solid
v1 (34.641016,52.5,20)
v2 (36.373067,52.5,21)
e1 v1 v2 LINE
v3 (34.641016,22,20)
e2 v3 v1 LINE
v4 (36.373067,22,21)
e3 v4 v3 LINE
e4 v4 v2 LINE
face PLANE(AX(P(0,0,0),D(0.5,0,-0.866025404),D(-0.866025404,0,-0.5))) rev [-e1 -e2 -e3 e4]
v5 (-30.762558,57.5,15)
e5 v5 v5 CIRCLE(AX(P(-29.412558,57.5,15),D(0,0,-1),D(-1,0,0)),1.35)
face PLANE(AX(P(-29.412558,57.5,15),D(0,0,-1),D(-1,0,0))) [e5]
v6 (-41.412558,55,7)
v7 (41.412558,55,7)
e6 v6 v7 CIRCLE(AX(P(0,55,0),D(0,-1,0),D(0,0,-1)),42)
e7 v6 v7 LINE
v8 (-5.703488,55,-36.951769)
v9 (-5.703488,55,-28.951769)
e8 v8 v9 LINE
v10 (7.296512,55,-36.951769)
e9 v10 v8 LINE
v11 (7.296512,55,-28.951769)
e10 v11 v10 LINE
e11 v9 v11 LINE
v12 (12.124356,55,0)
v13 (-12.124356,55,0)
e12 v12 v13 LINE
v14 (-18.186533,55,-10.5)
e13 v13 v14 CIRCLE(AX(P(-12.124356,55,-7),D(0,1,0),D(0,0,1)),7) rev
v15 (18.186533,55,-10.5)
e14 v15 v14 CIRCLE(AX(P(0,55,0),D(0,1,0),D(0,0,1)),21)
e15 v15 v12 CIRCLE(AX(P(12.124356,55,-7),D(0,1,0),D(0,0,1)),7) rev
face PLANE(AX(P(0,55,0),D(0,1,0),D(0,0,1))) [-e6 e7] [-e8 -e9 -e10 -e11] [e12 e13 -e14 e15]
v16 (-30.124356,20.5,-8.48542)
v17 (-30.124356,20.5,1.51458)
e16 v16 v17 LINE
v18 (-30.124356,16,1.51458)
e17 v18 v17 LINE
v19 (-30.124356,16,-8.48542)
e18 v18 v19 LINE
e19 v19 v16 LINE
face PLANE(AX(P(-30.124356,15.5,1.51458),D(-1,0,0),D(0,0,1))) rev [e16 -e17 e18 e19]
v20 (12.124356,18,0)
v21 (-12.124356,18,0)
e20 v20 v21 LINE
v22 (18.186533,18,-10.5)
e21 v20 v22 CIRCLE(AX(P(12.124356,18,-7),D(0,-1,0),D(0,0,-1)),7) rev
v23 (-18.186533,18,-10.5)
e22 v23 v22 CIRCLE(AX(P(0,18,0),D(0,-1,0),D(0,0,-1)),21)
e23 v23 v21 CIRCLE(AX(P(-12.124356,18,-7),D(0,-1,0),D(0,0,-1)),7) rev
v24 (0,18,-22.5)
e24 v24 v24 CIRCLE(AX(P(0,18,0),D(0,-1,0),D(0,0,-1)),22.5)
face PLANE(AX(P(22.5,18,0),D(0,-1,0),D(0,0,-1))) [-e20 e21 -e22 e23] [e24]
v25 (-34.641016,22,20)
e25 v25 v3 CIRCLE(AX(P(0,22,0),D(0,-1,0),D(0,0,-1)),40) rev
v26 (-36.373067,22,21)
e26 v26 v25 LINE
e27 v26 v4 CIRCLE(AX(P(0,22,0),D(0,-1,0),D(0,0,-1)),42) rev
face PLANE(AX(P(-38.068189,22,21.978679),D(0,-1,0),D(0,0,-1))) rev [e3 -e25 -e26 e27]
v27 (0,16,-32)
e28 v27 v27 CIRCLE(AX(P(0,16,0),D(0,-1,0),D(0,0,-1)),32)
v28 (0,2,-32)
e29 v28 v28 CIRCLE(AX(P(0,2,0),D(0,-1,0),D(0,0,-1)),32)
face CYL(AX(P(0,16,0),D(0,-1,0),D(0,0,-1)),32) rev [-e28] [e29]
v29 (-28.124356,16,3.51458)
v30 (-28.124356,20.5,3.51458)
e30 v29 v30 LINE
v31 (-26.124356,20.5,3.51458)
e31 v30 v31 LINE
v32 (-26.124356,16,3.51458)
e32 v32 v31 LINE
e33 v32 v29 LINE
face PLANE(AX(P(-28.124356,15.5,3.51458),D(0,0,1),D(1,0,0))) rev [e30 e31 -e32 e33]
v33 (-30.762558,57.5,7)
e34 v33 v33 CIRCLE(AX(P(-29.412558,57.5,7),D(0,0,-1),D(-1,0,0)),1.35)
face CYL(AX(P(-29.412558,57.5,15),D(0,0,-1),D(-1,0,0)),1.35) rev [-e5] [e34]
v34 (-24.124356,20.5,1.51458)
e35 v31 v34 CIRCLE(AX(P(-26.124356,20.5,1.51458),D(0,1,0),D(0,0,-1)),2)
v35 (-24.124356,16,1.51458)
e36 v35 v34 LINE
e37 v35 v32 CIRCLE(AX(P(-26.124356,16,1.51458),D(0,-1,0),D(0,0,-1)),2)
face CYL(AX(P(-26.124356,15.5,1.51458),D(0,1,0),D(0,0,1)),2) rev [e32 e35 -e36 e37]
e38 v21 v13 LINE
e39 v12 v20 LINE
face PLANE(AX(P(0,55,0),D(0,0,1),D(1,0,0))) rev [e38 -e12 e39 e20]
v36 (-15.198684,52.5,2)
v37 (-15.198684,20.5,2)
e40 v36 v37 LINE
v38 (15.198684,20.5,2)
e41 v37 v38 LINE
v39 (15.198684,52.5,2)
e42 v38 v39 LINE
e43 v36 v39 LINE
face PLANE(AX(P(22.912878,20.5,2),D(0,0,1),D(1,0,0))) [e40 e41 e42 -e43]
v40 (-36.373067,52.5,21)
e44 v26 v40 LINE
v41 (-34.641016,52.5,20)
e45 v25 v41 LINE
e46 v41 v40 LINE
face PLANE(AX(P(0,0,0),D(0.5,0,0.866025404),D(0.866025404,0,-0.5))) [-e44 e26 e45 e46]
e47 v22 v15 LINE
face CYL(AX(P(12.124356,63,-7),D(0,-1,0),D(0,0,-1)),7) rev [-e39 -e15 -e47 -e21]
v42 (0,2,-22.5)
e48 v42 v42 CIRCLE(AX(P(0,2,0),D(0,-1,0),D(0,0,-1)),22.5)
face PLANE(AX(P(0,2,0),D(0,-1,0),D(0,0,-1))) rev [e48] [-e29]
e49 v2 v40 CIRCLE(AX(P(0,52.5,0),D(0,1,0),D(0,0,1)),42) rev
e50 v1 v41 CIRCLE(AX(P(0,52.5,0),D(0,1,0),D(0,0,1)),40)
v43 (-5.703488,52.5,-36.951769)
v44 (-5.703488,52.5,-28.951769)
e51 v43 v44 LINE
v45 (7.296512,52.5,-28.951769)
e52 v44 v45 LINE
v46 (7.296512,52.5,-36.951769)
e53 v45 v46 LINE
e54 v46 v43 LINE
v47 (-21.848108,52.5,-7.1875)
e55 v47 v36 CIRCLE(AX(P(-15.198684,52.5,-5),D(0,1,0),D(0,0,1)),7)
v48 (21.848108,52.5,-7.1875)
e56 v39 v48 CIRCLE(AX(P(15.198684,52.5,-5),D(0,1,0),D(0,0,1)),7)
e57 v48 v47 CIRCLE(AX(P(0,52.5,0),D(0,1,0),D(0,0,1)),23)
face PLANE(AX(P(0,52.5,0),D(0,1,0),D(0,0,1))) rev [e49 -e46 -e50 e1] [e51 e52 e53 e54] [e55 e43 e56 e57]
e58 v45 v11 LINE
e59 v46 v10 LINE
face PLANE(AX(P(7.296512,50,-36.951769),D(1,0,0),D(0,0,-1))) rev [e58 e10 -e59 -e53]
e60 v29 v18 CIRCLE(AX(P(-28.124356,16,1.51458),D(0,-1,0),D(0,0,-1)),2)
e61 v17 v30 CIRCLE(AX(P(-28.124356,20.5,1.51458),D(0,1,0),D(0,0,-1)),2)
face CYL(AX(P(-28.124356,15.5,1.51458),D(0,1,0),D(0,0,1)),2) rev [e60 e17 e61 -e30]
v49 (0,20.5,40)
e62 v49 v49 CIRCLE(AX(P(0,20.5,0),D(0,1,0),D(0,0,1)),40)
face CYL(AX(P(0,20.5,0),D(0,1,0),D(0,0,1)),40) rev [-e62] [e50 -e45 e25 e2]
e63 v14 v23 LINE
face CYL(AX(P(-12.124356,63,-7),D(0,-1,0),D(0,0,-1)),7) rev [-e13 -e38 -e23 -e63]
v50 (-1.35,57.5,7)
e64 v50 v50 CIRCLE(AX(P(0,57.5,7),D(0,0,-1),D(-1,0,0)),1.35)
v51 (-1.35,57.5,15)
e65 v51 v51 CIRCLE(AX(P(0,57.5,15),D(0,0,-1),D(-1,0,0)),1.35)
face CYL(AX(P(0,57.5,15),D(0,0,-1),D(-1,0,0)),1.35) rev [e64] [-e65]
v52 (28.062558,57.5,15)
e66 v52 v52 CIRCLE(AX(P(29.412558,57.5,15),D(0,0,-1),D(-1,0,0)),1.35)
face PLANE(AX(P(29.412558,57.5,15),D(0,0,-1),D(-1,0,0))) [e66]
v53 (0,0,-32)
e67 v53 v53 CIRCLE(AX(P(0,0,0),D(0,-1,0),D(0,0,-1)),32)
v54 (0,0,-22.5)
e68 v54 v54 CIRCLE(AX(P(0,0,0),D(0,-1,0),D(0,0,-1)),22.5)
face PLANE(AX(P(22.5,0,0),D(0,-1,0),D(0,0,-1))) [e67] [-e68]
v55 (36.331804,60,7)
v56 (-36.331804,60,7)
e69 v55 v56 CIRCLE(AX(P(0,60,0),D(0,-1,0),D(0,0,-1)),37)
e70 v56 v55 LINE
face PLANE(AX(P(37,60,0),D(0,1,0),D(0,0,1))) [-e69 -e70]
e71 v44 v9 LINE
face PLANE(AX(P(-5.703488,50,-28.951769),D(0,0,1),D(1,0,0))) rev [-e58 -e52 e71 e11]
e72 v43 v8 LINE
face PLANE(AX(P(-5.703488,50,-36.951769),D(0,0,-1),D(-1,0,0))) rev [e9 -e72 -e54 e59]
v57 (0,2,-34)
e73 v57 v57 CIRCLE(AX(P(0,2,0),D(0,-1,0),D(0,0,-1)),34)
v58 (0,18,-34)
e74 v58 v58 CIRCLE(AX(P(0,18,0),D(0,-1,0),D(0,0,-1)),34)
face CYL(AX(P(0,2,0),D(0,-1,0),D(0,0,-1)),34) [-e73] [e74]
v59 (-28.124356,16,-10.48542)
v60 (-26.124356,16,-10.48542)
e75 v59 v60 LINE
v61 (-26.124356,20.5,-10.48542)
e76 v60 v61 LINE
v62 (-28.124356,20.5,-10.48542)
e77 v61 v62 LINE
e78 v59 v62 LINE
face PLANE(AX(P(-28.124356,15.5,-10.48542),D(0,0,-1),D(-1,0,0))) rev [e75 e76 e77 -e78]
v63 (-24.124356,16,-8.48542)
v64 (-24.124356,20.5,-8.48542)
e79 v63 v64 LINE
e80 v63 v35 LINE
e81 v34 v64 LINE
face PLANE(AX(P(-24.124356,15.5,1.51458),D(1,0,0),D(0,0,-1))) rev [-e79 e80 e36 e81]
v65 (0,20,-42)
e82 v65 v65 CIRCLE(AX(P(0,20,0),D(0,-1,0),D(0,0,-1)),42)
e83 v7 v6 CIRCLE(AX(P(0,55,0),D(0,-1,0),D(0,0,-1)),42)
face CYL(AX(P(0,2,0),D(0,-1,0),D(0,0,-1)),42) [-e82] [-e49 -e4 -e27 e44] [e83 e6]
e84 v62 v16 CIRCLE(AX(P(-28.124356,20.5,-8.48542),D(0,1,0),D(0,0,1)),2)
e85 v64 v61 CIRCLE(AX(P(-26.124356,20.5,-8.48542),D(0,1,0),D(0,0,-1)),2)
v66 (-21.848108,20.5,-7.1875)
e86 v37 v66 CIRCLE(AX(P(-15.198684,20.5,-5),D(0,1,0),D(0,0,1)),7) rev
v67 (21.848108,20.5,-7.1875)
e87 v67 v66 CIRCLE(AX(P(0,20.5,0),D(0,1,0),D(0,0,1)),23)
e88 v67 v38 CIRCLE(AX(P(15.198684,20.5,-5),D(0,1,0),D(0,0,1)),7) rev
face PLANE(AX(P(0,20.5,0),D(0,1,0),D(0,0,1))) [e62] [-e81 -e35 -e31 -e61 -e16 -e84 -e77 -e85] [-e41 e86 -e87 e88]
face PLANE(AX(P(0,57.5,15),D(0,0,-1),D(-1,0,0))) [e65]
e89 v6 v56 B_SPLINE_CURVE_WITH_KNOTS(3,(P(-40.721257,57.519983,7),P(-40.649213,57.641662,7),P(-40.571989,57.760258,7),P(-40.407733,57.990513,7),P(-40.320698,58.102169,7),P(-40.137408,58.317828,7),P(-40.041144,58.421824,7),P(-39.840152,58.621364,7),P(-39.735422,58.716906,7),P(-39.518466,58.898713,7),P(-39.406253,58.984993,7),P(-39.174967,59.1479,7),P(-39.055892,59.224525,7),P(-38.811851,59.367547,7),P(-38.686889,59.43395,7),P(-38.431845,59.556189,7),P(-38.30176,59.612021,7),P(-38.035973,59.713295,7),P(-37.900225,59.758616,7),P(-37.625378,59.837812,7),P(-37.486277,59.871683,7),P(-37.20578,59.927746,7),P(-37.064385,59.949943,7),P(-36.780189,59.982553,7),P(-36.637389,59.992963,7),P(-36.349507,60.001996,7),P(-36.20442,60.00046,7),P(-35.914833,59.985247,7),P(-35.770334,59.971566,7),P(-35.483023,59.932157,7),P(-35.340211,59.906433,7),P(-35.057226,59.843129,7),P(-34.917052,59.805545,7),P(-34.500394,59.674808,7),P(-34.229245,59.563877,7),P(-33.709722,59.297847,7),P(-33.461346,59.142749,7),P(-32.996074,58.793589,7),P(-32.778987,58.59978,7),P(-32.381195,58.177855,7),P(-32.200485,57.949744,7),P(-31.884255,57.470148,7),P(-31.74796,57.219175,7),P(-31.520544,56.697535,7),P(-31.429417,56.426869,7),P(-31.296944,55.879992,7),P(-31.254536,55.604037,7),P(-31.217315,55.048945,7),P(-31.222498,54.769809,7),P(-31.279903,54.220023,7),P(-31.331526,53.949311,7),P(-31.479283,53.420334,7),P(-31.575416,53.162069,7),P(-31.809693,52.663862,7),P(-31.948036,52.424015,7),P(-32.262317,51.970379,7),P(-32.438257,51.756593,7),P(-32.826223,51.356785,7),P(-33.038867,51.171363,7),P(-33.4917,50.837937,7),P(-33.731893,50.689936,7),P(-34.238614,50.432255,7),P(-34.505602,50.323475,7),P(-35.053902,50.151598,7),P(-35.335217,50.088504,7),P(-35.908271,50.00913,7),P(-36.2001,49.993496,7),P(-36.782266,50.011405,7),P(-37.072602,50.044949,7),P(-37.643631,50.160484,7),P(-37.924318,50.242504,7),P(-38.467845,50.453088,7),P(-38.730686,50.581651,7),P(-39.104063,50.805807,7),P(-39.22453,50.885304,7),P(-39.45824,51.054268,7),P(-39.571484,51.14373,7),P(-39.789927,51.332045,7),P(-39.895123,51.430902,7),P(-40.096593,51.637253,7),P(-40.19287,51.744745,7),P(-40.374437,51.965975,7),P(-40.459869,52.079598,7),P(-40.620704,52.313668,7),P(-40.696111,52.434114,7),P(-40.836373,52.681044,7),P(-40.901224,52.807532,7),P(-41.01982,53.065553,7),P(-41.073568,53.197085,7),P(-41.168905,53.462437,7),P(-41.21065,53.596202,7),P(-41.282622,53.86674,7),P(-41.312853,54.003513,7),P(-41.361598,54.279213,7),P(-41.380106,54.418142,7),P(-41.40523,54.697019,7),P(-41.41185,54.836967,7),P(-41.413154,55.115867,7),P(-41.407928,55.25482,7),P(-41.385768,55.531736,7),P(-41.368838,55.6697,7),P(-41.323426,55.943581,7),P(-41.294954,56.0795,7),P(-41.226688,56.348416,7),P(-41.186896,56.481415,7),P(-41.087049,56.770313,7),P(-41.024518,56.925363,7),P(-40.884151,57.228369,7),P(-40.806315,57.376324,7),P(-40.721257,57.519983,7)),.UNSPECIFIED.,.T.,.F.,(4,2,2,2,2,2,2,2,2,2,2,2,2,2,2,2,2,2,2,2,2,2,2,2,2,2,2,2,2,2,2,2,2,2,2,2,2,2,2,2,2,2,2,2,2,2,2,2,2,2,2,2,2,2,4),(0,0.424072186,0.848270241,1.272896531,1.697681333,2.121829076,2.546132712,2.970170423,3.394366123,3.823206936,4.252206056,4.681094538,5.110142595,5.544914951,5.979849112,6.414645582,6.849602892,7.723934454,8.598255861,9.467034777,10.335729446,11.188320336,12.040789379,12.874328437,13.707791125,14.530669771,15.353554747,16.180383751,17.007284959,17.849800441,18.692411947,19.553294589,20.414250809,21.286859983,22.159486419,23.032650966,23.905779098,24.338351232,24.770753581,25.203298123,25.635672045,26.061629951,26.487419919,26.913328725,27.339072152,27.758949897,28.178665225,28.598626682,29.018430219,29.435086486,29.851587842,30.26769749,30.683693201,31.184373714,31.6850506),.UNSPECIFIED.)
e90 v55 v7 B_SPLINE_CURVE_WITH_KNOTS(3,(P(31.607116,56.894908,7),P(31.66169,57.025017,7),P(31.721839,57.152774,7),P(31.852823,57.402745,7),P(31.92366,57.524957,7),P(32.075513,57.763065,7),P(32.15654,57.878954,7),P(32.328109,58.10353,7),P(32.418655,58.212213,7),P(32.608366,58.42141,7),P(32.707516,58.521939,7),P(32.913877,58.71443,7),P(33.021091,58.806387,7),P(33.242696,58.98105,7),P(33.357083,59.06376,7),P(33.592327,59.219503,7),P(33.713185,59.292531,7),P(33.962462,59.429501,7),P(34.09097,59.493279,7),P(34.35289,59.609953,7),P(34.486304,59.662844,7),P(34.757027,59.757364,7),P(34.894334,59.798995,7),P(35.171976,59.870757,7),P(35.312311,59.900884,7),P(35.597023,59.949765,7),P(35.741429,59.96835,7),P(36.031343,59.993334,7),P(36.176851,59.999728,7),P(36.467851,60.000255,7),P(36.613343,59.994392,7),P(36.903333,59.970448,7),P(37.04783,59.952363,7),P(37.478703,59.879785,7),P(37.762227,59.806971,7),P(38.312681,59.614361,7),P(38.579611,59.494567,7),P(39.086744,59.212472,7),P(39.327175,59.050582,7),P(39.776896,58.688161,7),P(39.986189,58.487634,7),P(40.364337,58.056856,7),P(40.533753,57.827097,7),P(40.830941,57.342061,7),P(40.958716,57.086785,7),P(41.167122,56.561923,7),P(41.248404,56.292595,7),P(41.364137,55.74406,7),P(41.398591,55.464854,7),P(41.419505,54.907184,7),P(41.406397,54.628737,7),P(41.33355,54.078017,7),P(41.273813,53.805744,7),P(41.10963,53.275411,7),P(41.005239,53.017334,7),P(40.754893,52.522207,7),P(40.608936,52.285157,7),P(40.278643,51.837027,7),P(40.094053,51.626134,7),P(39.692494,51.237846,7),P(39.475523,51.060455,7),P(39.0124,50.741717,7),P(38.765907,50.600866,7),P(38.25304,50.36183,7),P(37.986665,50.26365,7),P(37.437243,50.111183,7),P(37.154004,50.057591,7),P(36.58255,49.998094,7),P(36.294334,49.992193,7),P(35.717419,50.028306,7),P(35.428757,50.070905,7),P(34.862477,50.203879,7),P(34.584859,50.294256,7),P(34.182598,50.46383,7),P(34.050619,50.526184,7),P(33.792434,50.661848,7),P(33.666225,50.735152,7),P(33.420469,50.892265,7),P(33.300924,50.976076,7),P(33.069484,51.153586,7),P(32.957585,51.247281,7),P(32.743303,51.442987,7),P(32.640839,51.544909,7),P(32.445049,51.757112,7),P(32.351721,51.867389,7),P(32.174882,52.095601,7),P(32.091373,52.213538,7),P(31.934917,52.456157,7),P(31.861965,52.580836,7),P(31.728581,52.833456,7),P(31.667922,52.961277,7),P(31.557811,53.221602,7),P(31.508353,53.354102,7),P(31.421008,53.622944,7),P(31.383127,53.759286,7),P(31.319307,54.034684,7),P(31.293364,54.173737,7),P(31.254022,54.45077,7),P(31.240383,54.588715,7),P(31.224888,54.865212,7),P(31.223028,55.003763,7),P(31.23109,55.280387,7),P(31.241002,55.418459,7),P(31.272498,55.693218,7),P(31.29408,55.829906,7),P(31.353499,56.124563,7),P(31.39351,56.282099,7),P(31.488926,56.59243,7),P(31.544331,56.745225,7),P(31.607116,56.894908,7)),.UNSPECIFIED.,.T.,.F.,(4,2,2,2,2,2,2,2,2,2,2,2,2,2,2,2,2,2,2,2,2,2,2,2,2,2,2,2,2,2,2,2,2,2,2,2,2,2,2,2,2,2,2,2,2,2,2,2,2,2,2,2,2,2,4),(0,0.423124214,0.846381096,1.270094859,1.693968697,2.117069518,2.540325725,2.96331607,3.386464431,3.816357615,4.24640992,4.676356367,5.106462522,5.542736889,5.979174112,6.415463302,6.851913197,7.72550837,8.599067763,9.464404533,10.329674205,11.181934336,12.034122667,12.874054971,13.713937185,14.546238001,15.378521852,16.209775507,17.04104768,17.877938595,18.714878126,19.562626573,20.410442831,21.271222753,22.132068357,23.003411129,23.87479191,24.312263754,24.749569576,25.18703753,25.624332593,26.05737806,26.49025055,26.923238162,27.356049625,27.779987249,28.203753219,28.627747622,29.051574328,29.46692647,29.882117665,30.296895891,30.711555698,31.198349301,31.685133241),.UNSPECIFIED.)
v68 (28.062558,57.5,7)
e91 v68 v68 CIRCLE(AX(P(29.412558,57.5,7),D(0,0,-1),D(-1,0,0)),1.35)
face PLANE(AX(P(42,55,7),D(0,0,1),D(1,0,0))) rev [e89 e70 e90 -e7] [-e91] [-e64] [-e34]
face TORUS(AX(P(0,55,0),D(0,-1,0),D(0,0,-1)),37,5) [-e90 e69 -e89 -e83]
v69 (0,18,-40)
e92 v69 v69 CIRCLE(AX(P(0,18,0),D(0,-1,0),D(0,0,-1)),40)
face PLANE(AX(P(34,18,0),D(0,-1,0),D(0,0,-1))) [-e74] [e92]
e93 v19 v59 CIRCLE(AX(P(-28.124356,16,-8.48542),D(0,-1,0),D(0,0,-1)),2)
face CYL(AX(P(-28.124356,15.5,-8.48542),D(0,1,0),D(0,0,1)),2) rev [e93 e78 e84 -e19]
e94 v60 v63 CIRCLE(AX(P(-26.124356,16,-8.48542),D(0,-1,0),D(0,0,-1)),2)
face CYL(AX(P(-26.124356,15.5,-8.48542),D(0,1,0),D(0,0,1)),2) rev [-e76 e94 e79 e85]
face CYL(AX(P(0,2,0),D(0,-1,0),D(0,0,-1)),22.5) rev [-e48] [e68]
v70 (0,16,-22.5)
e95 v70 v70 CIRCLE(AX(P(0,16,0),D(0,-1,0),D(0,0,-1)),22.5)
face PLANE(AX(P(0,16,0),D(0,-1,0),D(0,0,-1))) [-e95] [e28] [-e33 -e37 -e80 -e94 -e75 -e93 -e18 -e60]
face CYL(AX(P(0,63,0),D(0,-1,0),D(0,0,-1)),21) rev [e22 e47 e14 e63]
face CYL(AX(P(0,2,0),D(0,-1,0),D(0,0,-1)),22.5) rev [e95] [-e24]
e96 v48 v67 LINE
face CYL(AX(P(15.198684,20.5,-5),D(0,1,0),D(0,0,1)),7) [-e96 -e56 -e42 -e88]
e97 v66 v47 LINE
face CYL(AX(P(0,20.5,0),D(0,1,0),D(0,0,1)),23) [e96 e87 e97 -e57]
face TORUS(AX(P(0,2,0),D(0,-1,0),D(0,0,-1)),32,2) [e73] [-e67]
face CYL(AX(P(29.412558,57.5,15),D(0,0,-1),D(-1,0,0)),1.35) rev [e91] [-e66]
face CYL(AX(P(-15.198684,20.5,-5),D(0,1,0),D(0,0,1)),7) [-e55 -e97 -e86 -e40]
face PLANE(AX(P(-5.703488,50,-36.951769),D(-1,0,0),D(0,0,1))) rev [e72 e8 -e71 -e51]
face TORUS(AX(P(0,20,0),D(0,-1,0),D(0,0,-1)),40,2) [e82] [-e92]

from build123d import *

# Parameters (mm, degrees)
CUT_EXTRUDE1_DEPTH  = 5
CUT_EXTRUDE3_DEPTH  = 45
SKETCH8_R           = 40
CUT_EXTRUDE4_DEPTH  = 32
SKETCH9_R           = 32
SKETCH9_R_2         = 24.5
CUT_EXTRUDE5_DEPTH  = 14
SKETCH10_R          = 26
CUT_EXTRUDE6_DEPTH  = 14
FILLET1_R           = 7
FILLET2_R           = 7
CUT_REVOLVE1_START  = 22
CUT_REVOLVE1_DEPTH  = 30.5
CUT_EXTRUDE12_DEPTH = 5
SKETCH18_W          = 13
SKETCH18_H          = 8
CUT_EXTRUDE13_DEPTH = 5
SKETCH20_W          = 84
SKETCH20_H          = 7
CUT_EXTRUDE15_DEPTH = 5
SKETCH19_R          = 1.35
CUT_EXTRUDE14_DEPTH = 8


# Read off the part's stored shape, not the designer's step: Cut-Revolve1
with BuildPart() as part:
    # Sketch1 → Revolve1 (revolve)
    with BuildSketch(Plane.XY, mode=Mode.PRIVATE) as revolve1_sk:
        with BuildLine():
            Line((22.5, 0), (32, 0))
            ThreePointArc((32, 0), (33.414213562, 0.585786438), (34, 2))
            Line((34, 2), (34, 18))
            Line((34, 18), (40, 18))
            ThreePointArc((40, 18), (41.414213562, 18.585786438), (42, 20))
            Line((42, 20), (42, 55))
            ThreePointArc((42, 55), (40.535533906, 58.535533906), (37, 60))
            Line((37, 60), (0, 60))
            Line((0, 60), (0, 18))
            Line((0, 18), (22.5, 18))
            Line((22.5, 18), (22.5, 0))
        make_face()
    revolve(revolve1_sk.sketch.rotate(Axis((0, 2, 0), (0, 1, 0)), 90), axis=Axis((0, 2, 0), (0, 1, 0)))

    # Sketch5 → Cut-Extrude1 (cut)
    with BuildSketch(Plane(origin=(0, 60, 0), x_dir=(1, 0, 0), z_dir=(0, 1, 0))):
        with BuildLine():
            Line((-42, 0), (-40, 0))
            Line((-40, 0), (40, 0))
            Line((40, 0), (42, 0))
            ThreePointArc((42, 0), (0, 42), (-42, 0))
        make_face()
    extrude(amount=-CUT_EXTRUDE1_DEPTH, mode=Mode.SUBTRACT)

    # Sketch7 → Cut-Extrude3 (cut)
    with BuildSketch(Plane.XZ.offset(-18)):
        with BuildLine():
            Line((-21, 0), (21, 0))
            ThreePointArc((21, 0), (0, -21), (-21, 0))
        make_face()
    extrude(amount=-CUT_EXTRUDE3_DEPTH, mode=Mode.SUBTRACT)

    # Sketch8 → Cut-Extrude4 (cut)
    with BuildSketch(Plane(origin=(0, 52.5, 0), x_dir=(1, 0, 0), z_dir=(0, 1, 0))):
        with Locations(Location((0, 0, 0), (0, 0, 270))):
            Circle(SKETCH8_R)
        with BuildLine():
            Line((22.912878475, -2), (-22.912878475, -2))
            ThreePointArc((-22.912878475, -2), (0, 23), (22.912878475, -2))
        make_face(mode=Mode.SUBTRACT)
    extrude(amount=-CUT_EXTRUDE4_DEPTH, mode=Mode.SUBTRACT)

    # Sketch9 → Cut-Extrude5 (cut)
    with BuildSketch(Plane(origin=(0, 2, 0), x_dir=(-1, 0, 0), z_dir=(0, -1, 0))):
        with Locations(Location((0, 0, 0), (0, 0, 90))):
            Circle(SKETCH9_R)
        with Locations(Location((0, 0, 0), (0, 0, 90))):
            Circle(SKETCH9_R_2, mode=Mode.SUBTRACT)
    extrude(amount=-CUT_EXTRUDE5_DEPTH, mode=Mode.SUBTRACT)

    # Sketch10 → Cut-Extrude6 (cut)
    with BuildSketch(Plane(origin=(0, 2, 0), x_dir=(-1, 0, 0), z_dir=(0, -1, 0))):
        Circle(SKETCH10_R)
    extrude(amount=-CUT_EXTRUDE6_DEPTH, mode=Mode.SUBTRACT)

    # Fillet1
    fillet1_edges = [part.edges().sort_by_distance(p)[0] for p in [
        (21, 36.5, 0),
        (-21, 36.5, 0),
    ]]
    fillet(fillet1_edges, radius=FILLET1_R)

    # Fillet2
    fillet2_edges = [part.edges().sort_by_distance(p)[0] for p in [
        (-22.912878475, 36.5, 2),
        (22.912878475, 36.5, 2),
    ]]
    fillet(fillet2_edges, radius=FILLET2_R)

    # Cut-Revolve1 outline → Cut-Revolve1 (cut)
    with BuildSketch(Plane(origin=(0, 0, 0), x_dir=(1, 0, 0), z_dir=(0, 1, 0)).offset(CUT_REVOLVE1_START)):
        with BuildLine():
            Line((-34.641016151, -20), (-36.373066959, -21))
            ThreePointArc((-36.373066959, -21), (0, -42), (36.373066959, -21))
            Line((36.373066959, -21), (34.641016151, -20))
            ThreePointArc((34.641016151, -20), (0, -40), (-34.641016151, -20))
        make_face()
    extrude(amount=CUT_REVOLVE1_DEPTH, mode=Mode.SUBTRACT)

    # Sketch15 → Cut-Extrude12 (cut)
    with BuildSketch(Plane(origin=(0, 20.5, 0), x_dir=(1, 0, 0), z_dir=(0, 1, 0))):
        with BuildLine():
            Line((-28.124355653, -3.514579578), (-26.124355653, -3.514579578))
            ThreePointArc((-26.124355653, -3.514579578), (-24.710142091, -2.928793141), (-24.124355653, -1.514579578))
            Line((-24.124355653, -1.514579578), (-24.124355653, 8.485420422))
            ThreePointArc((-24.124355653, 8.485420422), (-24.710142091, 9.899633984), (-26.124355653, 10.485420422))
            Line((-26.124355653, 10.485420422), (-28.124355653, 10.485420422))
            ThreePointArc((-28.124355653, 10.485420422), (-29.538569215, 9.899633984), (-30.124355653, 8.485420422))
            Line((-30.124355653, 8.485420422), (-30.124355653, -1.514579578))
            ThreePointArc((-30.124355653, -1.514579578), (-29.538569215, -2.928793141), (-28.124355653, -3.514579578))
        make_face()
    extrude(amount=-CUT_EXTRUDE12_DEPTH, mode=Mode.SUBTRACT)

    # Sketch18 → Cut-Extrude13 (cut)
    with BuildSketch(Plane(origin=(0, 55, 0), x_dir=(1, 0, 0), z_dir=(0, 1, 0))):
        with Locations((0.796512215, 32.951769165)):
            Rectangle(SKETCH18_W, SKETCH18_H)
    extrude(amount=-CUT_EXTRUDE13_DEPTH, mode=Mode.SUBTRACT)

    # Sketch20 → Cut-Extrude15 (cut)
    with BuildSketch(Plane(origin=(0, 60, 0), x_dir=(1, 0, 0), z_dir=(0, 1, 0))):
        with Locations((0, -3.5)):
            Rectangle(SKETCH20_W, SKETCH20_H)
    extrude(amount=-CUT_EXTRUDE15_DEPTH, mode=Mode.SUBTRACT)

    # Sketch19 → Cut-Extrude14 (cut)
    with BuildSketch(Plane(origin=(0, 0, 7), x_dir=(-1, 0, 0), z_dir=(0, 0, -1))):
        with Locations((0, 57.5)):
            Circle(SKETCH19_R)
        with Locations((-29.412558482, 57.5)):
            Circle(SKETCH19_R)
        with Locations((29.412558482, 57.5)):
            Circle(SKETCH19_R)
    extrude(amount=-CUT_EXTRUDE14_DEPTH, mode=Mode.SUBTRACT)


solid = part.part
